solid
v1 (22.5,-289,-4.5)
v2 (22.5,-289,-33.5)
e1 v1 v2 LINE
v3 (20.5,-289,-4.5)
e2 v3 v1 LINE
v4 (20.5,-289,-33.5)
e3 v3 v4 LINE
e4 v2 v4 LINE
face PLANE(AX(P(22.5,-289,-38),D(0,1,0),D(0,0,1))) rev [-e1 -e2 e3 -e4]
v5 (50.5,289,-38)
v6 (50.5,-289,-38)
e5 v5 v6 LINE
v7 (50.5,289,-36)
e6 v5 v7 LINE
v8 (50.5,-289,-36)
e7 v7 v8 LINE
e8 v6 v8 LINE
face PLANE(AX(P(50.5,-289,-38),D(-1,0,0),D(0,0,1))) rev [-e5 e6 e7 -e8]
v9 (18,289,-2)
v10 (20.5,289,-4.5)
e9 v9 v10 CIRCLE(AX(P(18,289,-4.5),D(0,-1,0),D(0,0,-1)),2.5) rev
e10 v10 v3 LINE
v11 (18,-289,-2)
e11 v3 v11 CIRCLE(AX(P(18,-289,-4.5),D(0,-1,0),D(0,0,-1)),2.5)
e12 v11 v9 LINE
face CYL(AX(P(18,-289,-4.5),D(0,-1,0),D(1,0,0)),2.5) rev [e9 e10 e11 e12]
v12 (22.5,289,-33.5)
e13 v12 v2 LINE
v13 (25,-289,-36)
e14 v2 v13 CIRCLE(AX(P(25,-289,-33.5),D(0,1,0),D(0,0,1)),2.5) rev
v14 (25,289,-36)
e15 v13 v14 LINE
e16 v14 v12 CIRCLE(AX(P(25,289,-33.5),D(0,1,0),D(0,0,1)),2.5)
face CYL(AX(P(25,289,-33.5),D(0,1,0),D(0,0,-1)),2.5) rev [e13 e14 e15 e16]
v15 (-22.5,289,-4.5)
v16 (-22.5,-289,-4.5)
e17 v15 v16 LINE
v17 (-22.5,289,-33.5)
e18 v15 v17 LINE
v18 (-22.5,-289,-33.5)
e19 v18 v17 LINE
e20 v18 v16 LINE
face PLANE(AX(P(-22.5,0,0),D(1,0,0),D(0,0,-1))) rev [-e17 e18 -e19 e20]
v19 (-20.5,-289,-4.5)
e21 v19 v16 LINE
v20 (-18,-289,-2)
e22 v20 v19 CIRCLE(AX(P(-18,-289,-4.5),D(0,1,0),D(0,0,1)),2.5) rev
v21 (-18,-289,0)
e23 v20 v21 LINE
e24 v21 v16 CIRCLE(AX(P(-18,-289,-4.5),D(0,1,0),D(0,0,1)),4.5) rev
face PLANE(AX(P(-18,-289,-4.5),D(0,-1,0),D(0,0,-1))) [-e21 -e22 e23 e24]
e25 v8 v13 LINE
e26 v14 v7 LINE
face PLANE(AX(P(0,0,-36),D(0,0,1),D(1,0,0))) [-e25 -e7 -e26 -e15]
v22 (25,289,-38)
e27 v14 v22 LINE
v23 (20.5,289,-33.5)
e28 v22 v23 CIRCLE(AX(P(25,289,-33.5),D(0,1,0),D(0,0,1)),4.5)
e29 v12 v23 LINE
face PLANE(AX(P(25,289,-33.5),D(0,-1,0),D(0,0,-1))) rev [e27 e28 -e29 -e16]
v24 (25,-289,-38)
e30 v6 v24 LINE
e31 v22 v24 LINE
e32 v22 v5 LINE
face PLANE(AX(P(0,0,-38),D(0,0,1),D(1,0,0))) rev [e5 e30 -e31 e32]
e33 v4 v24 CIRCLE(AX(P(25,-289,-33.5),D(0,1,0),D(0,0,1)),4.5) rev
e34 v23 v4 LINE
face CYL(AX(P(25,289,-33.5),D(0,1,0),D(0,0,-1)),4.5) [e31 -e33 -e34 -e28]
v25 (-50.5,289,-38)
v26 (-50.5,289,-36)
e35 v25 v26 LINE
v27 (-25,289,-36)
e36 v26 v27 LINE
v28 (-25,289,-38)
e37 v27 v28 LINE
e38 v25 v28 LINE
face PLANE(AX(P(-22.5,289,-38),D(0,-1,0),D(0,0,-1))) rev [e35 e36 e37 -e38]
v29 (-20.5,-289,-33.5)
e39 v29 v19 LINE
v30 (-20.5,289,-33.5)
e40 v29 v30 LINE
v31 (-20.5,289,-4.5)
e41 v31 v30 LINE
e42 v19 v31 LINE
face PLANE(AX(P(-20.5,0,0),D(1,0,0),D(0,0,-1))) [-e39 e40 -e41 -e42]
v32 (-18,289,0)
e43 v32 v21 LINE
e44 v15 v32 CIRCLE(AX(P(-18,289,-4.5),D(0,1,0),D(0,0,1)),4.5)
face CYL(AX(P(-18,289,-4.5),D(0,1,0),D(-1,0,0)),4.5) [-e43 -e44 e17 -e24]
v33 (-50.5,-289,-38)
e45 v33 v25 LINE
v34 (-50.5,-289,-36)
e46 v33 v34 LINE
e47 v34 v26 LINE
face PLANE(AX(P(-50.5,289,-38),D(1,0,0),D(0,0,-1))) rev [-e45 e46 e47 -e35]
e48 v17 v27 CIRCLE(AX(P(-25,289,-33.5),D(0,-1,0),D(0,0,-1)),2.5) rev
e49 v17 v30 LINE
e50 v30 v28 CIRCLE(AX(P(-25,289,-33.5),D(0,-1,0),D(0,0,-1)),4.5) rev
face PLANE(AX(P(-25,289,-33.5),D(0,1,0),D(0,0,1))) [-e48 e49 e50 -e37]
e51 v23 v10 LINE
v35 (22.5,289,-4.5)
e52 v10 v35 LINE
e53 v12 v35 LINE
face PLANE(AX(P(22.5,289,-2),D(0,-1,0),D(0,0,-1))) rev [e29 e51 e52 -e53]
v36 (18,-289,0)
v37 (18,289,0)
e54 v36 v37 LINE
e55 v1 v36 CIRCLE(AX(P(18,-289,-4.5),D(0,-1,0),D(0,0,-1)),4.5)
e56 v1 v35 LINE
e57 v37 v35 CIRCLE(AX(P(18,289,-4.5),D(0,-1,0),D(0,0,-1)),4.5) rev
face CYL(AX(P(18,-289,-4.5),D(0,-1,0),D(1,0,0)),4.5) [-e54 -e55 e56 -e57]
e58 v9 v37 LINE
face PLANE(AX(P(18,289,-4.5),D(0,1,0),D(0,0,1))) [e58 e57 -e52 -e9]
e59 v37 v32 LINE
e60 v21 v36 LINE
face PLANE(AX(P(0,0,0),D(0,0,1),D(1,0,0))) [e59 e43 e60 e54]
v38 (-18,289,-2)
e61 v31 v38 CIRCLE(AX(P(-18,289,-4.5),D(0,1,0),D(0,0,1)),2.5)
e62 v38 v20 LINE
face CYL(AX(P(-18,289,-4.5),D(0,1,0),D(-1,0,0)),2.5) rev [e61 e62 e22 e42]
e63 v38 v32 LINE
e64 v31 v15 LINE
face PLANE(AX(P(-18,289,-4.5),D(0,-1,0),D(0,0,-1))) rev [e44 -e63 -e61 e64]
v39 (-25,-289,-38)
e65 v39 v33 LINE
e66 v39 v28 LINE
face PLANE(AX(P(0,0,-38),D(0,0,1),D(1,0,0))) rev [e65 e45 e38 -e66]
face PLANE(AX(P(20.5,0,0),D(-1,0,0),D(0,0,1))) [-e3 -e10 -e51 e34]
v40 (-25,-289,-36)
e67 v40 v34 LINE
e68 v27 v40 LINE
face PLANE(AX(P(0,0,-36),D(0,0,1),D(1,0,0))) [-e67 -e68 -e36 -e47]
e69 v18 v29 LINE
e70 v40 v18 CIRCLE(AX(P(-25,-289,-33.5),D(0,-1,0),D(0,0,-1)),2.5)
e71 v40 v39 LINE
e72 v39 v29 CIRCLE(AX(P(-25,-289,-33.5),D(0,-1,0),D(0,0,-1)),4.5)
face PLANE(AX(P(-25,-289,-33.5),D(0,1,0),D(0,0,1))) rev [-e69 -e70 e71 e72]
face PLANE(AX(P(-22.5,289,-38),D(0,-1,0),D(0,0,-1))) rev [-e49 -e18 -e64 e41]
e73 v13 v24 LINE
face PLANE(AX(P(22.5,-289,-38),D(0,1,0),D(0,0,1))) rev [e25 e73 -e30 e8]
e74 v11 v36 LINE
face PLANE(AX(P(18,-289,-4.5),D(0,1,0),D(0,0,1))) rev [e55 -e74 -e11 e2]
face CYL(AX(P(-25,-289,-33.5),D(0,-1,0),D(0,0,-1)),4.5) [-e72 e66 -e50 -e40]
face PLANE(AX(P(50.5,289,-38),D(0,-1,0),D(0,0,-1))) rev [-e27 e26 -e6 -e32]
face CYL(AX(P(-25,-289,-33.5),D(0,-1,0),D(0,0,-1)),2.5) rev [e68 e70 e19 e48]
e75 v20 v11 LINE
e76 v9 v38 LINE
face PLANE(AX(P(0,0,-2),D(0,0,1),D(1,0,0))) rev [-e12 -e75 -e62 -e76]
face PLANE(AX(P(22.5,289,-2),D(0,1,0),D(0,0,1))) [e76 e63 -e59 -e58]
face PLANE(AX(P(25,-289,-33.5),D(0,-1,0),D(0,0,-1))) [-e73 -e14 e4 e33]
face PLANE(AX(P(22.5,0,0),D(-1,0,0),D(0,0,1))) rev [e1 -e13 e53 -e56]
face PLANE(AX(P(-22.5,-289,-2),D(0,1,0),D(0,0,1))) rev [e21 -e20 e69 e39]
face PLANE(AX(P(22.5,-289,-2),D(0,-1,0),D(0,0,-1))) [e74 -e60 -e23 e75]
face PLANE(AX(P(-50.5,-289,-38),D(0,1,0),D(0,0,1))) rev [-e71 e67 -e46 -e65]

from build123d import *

# Parameters (mm, degrees)
SKETCH1_W                      = 45
SKETCH1_H                      = 578
BASE_FLANGE1_DEPTH             = 2
EDGE_FLANGE1_STRIP_W           = 13
EDGE_FLANGE1_STRIP_H           = 2
EDGE_FLANGE1_STRIP_CUT_DEPTH   = 578
EDGE_FLANGE1_STRIP_2_W         = 13
EDGE_FLANGE1_STRIP_2_H         = 2
EDGE_FLANGE1_STRIP_CUT_2_DEPTH = 578
EDGE_FLANGE1_DEPTH             = 578
EDGE_FLANGE1_BEND_DEPTH        = 578
EDGE_FLANGE2_STRIP_W           = 13
EDGE_FLANGE2_STRIP_H           = 2
EDGE_FLANGE2_STRIP_CUT_DEPTH   = 578
EDGE_FLANGE2_STRIP_2_W         = 13
EDGE_FLANGE2_STRIP_2_H         = 2
EDGE_FLANGE2_STRIP_CUT_2_DEPTH = 578
EDGE_FLANGE2_DEPTH             = 578
EDGE_FLANGE2_BEND_DEPTH        = 578


# Sheet-metal steps are written as plain solids
with BuildPart() as part:
    # Sketch1 → Base-Flange1 (new body)
    with BuildSketch(Plane.XY):
        Rectangle(SKETCH1_W, SKETCH1_H)
    extrude(amount=-BASE_FLANGE1_DEPTH)

    # Edge-Flange1 strip (across the edge) → Edge-Flange1 strip cut (cut)
    with BuildSketch(Plane(origin=(22.5, 289, -2), x_dir=(-1, 0, 0), z_dir=(0, -1, 0))):
        with Locations((-2, -1)):
            Rectangle(EDGE_FLANGE1_STRIP_W, EDGE_FLANGE1_STRIP_H)
    extrude(amount=EDGE_FLANGE1_STRIP_CUT_DEPTH, mode=Mode.SUBTRACT)

    # Edge-Flange1 strip 2 (across the edge) → Edge-Flange1 strip cut 2 (cut)
    with BuildSketch(Plane(origin=(-22.5, -289, -2), x_dir=(1, 0, 0), z_dir=(0, 1, 0))):
        with Locations((-2, -1)):
            Rectangle(EDGE_FLANGE1_STRIP_2_W, EDGE_FLANGE1_STRIP_2_H)
    extrude(amount=EDGE_FLANGE1_STRIP_CUT_2_DEPTH, mode=Mode.SUBTRACT)

    # Edge-Flange1 section (across the edge) → Edge-Flange1 (add)
    with BuildSketch(Plane(origin=(22.5, 289, -2), x_dir=(-1, 0, 0), z_dir=(0, -1, 0))):
        with BuildLine():
            Line((0, 2.5), (0, 36))
            Line((0, 36), (2, 36))
            Line((2, 36), (2, 2.5))
            ThreePointArc((2, 2.5), (2.732233047, 0.732233047), (4.5, 0))
            Line((4.5, 0), (4.5, -2))
            ThreePointArc((4.5, -2), (1.318019485, -0.681980515), (0, 2.5))
        make_face()
    extrude(amount=EDGE_FLANGE1_DEPTH)

    # Edge-Flange1 section 2 (across the edge) → Edge-Flange1 bend (add)
    with BuildSketch(Plane(origin=(-22.5, -289, -2), x_dir=(1, 0, 0), z_dir=(0, 1, 0))):
        with BuildLine():
            Line((0, 2.5), (0, 36))
            Line((0, 36), (2, 36))
            Line((2, 36), (2, 2.5))
            ThreePointArc((2, 2.5), (2.732233047, 0.732233047), (4.5, 0))
            Line((4.5, 0), (4.5, -2))
            ThreePointArc((4.5, -2), (1.318019485, -0.681980515), (0, 2.5))
        make_face()
    extrude(amount=EDGE_FLANGE1_BEND_DEPTH)

    # Edge-Flange2 strip (across the edge) → Edge-Flange2 strip cut (cut)
    with BuildSketch(Plane(origin=(-22.5, 289, -38), x_dir=(0, 0, 1), z_dir=(0, -1, 0))):
        with Locations((-2, -1)):
            Rectangle(EDGE_FLANGE2_STRIP_W, EDGE_FLANGE2_STRIP_H)
    extrude(amount=EDGE_FLANGE2_STRIP_CUT_DEPTH, mode=Mode.SUBTRACT)

    # Edge-Flange2 strip 2 (across the edge) → Edge-Flange2 strip cut 2 (cut)
    with BuildSketch(Plane(origin=(22.5, -289, -38), x_dir=(0, 0, 1), z_dir=(0, 1, 0))):
        with Locations((-2, -1)):
            Rectangle(EDGE_FLANGE2_STRIP_2_W, EDGE_FLANGE2_STRIP_2_H)
    extrude(amount=EDGE_FLANGE2_STRIP_CUT_2_DEPTH, mode=Mode.SUBTRACT)

    # Edge-Flange2 section (across the edge) → Edge-Flange2 (add)
    with BuildSketch(Plane(origin=(-22.5, 289, -38), x_dir=(0, 0, 1), z_dir=(0, -1, 0))):
        with BuildLine():
            Line((0, 2.5), (0, 28))
            Line((0, 28), (2, 28))
            Line((2, 28), (2, 2.5))
            ThreePointArc((2, 2.5), (2.732233047, 0.732233047), (4.5, 0))
            Line((4.5, 0), (4.5, -2))
            ThreePointArc((4.5, -2), (1.318019485, -0.681980515), (0, 2.5))
        make_face()
    extrude(amount=EDGE_FLANGE2_DEPTH)

    # Edge-Flange2 section 2 (across the edge) → Edge-Flange2 bend (add)
    with BuildSketch(Plane(origin=(22.5, -289, -38), x_dir=(0, 0, 1), z_dir=(0, 1, 0))):
        with BuildLine():
            Line((0, 2.5), (0, 28))
            Line((0, 28), (2, 28))
            Line((2, 28), (2, 2.5))
            ThreePointArc((2, 2.5), (2.732233047, 0.732233047), (4.5, 0))
            Line((4.5, 0), (4.5, -2))
            ThreePointArc((4.5, -2), (1.318019485, -0.681980515), (0, 2.5))
        make_face()
    extrude(amount=EDGE_FLANGE2_BEND_DEPTH)


solid = part.part
